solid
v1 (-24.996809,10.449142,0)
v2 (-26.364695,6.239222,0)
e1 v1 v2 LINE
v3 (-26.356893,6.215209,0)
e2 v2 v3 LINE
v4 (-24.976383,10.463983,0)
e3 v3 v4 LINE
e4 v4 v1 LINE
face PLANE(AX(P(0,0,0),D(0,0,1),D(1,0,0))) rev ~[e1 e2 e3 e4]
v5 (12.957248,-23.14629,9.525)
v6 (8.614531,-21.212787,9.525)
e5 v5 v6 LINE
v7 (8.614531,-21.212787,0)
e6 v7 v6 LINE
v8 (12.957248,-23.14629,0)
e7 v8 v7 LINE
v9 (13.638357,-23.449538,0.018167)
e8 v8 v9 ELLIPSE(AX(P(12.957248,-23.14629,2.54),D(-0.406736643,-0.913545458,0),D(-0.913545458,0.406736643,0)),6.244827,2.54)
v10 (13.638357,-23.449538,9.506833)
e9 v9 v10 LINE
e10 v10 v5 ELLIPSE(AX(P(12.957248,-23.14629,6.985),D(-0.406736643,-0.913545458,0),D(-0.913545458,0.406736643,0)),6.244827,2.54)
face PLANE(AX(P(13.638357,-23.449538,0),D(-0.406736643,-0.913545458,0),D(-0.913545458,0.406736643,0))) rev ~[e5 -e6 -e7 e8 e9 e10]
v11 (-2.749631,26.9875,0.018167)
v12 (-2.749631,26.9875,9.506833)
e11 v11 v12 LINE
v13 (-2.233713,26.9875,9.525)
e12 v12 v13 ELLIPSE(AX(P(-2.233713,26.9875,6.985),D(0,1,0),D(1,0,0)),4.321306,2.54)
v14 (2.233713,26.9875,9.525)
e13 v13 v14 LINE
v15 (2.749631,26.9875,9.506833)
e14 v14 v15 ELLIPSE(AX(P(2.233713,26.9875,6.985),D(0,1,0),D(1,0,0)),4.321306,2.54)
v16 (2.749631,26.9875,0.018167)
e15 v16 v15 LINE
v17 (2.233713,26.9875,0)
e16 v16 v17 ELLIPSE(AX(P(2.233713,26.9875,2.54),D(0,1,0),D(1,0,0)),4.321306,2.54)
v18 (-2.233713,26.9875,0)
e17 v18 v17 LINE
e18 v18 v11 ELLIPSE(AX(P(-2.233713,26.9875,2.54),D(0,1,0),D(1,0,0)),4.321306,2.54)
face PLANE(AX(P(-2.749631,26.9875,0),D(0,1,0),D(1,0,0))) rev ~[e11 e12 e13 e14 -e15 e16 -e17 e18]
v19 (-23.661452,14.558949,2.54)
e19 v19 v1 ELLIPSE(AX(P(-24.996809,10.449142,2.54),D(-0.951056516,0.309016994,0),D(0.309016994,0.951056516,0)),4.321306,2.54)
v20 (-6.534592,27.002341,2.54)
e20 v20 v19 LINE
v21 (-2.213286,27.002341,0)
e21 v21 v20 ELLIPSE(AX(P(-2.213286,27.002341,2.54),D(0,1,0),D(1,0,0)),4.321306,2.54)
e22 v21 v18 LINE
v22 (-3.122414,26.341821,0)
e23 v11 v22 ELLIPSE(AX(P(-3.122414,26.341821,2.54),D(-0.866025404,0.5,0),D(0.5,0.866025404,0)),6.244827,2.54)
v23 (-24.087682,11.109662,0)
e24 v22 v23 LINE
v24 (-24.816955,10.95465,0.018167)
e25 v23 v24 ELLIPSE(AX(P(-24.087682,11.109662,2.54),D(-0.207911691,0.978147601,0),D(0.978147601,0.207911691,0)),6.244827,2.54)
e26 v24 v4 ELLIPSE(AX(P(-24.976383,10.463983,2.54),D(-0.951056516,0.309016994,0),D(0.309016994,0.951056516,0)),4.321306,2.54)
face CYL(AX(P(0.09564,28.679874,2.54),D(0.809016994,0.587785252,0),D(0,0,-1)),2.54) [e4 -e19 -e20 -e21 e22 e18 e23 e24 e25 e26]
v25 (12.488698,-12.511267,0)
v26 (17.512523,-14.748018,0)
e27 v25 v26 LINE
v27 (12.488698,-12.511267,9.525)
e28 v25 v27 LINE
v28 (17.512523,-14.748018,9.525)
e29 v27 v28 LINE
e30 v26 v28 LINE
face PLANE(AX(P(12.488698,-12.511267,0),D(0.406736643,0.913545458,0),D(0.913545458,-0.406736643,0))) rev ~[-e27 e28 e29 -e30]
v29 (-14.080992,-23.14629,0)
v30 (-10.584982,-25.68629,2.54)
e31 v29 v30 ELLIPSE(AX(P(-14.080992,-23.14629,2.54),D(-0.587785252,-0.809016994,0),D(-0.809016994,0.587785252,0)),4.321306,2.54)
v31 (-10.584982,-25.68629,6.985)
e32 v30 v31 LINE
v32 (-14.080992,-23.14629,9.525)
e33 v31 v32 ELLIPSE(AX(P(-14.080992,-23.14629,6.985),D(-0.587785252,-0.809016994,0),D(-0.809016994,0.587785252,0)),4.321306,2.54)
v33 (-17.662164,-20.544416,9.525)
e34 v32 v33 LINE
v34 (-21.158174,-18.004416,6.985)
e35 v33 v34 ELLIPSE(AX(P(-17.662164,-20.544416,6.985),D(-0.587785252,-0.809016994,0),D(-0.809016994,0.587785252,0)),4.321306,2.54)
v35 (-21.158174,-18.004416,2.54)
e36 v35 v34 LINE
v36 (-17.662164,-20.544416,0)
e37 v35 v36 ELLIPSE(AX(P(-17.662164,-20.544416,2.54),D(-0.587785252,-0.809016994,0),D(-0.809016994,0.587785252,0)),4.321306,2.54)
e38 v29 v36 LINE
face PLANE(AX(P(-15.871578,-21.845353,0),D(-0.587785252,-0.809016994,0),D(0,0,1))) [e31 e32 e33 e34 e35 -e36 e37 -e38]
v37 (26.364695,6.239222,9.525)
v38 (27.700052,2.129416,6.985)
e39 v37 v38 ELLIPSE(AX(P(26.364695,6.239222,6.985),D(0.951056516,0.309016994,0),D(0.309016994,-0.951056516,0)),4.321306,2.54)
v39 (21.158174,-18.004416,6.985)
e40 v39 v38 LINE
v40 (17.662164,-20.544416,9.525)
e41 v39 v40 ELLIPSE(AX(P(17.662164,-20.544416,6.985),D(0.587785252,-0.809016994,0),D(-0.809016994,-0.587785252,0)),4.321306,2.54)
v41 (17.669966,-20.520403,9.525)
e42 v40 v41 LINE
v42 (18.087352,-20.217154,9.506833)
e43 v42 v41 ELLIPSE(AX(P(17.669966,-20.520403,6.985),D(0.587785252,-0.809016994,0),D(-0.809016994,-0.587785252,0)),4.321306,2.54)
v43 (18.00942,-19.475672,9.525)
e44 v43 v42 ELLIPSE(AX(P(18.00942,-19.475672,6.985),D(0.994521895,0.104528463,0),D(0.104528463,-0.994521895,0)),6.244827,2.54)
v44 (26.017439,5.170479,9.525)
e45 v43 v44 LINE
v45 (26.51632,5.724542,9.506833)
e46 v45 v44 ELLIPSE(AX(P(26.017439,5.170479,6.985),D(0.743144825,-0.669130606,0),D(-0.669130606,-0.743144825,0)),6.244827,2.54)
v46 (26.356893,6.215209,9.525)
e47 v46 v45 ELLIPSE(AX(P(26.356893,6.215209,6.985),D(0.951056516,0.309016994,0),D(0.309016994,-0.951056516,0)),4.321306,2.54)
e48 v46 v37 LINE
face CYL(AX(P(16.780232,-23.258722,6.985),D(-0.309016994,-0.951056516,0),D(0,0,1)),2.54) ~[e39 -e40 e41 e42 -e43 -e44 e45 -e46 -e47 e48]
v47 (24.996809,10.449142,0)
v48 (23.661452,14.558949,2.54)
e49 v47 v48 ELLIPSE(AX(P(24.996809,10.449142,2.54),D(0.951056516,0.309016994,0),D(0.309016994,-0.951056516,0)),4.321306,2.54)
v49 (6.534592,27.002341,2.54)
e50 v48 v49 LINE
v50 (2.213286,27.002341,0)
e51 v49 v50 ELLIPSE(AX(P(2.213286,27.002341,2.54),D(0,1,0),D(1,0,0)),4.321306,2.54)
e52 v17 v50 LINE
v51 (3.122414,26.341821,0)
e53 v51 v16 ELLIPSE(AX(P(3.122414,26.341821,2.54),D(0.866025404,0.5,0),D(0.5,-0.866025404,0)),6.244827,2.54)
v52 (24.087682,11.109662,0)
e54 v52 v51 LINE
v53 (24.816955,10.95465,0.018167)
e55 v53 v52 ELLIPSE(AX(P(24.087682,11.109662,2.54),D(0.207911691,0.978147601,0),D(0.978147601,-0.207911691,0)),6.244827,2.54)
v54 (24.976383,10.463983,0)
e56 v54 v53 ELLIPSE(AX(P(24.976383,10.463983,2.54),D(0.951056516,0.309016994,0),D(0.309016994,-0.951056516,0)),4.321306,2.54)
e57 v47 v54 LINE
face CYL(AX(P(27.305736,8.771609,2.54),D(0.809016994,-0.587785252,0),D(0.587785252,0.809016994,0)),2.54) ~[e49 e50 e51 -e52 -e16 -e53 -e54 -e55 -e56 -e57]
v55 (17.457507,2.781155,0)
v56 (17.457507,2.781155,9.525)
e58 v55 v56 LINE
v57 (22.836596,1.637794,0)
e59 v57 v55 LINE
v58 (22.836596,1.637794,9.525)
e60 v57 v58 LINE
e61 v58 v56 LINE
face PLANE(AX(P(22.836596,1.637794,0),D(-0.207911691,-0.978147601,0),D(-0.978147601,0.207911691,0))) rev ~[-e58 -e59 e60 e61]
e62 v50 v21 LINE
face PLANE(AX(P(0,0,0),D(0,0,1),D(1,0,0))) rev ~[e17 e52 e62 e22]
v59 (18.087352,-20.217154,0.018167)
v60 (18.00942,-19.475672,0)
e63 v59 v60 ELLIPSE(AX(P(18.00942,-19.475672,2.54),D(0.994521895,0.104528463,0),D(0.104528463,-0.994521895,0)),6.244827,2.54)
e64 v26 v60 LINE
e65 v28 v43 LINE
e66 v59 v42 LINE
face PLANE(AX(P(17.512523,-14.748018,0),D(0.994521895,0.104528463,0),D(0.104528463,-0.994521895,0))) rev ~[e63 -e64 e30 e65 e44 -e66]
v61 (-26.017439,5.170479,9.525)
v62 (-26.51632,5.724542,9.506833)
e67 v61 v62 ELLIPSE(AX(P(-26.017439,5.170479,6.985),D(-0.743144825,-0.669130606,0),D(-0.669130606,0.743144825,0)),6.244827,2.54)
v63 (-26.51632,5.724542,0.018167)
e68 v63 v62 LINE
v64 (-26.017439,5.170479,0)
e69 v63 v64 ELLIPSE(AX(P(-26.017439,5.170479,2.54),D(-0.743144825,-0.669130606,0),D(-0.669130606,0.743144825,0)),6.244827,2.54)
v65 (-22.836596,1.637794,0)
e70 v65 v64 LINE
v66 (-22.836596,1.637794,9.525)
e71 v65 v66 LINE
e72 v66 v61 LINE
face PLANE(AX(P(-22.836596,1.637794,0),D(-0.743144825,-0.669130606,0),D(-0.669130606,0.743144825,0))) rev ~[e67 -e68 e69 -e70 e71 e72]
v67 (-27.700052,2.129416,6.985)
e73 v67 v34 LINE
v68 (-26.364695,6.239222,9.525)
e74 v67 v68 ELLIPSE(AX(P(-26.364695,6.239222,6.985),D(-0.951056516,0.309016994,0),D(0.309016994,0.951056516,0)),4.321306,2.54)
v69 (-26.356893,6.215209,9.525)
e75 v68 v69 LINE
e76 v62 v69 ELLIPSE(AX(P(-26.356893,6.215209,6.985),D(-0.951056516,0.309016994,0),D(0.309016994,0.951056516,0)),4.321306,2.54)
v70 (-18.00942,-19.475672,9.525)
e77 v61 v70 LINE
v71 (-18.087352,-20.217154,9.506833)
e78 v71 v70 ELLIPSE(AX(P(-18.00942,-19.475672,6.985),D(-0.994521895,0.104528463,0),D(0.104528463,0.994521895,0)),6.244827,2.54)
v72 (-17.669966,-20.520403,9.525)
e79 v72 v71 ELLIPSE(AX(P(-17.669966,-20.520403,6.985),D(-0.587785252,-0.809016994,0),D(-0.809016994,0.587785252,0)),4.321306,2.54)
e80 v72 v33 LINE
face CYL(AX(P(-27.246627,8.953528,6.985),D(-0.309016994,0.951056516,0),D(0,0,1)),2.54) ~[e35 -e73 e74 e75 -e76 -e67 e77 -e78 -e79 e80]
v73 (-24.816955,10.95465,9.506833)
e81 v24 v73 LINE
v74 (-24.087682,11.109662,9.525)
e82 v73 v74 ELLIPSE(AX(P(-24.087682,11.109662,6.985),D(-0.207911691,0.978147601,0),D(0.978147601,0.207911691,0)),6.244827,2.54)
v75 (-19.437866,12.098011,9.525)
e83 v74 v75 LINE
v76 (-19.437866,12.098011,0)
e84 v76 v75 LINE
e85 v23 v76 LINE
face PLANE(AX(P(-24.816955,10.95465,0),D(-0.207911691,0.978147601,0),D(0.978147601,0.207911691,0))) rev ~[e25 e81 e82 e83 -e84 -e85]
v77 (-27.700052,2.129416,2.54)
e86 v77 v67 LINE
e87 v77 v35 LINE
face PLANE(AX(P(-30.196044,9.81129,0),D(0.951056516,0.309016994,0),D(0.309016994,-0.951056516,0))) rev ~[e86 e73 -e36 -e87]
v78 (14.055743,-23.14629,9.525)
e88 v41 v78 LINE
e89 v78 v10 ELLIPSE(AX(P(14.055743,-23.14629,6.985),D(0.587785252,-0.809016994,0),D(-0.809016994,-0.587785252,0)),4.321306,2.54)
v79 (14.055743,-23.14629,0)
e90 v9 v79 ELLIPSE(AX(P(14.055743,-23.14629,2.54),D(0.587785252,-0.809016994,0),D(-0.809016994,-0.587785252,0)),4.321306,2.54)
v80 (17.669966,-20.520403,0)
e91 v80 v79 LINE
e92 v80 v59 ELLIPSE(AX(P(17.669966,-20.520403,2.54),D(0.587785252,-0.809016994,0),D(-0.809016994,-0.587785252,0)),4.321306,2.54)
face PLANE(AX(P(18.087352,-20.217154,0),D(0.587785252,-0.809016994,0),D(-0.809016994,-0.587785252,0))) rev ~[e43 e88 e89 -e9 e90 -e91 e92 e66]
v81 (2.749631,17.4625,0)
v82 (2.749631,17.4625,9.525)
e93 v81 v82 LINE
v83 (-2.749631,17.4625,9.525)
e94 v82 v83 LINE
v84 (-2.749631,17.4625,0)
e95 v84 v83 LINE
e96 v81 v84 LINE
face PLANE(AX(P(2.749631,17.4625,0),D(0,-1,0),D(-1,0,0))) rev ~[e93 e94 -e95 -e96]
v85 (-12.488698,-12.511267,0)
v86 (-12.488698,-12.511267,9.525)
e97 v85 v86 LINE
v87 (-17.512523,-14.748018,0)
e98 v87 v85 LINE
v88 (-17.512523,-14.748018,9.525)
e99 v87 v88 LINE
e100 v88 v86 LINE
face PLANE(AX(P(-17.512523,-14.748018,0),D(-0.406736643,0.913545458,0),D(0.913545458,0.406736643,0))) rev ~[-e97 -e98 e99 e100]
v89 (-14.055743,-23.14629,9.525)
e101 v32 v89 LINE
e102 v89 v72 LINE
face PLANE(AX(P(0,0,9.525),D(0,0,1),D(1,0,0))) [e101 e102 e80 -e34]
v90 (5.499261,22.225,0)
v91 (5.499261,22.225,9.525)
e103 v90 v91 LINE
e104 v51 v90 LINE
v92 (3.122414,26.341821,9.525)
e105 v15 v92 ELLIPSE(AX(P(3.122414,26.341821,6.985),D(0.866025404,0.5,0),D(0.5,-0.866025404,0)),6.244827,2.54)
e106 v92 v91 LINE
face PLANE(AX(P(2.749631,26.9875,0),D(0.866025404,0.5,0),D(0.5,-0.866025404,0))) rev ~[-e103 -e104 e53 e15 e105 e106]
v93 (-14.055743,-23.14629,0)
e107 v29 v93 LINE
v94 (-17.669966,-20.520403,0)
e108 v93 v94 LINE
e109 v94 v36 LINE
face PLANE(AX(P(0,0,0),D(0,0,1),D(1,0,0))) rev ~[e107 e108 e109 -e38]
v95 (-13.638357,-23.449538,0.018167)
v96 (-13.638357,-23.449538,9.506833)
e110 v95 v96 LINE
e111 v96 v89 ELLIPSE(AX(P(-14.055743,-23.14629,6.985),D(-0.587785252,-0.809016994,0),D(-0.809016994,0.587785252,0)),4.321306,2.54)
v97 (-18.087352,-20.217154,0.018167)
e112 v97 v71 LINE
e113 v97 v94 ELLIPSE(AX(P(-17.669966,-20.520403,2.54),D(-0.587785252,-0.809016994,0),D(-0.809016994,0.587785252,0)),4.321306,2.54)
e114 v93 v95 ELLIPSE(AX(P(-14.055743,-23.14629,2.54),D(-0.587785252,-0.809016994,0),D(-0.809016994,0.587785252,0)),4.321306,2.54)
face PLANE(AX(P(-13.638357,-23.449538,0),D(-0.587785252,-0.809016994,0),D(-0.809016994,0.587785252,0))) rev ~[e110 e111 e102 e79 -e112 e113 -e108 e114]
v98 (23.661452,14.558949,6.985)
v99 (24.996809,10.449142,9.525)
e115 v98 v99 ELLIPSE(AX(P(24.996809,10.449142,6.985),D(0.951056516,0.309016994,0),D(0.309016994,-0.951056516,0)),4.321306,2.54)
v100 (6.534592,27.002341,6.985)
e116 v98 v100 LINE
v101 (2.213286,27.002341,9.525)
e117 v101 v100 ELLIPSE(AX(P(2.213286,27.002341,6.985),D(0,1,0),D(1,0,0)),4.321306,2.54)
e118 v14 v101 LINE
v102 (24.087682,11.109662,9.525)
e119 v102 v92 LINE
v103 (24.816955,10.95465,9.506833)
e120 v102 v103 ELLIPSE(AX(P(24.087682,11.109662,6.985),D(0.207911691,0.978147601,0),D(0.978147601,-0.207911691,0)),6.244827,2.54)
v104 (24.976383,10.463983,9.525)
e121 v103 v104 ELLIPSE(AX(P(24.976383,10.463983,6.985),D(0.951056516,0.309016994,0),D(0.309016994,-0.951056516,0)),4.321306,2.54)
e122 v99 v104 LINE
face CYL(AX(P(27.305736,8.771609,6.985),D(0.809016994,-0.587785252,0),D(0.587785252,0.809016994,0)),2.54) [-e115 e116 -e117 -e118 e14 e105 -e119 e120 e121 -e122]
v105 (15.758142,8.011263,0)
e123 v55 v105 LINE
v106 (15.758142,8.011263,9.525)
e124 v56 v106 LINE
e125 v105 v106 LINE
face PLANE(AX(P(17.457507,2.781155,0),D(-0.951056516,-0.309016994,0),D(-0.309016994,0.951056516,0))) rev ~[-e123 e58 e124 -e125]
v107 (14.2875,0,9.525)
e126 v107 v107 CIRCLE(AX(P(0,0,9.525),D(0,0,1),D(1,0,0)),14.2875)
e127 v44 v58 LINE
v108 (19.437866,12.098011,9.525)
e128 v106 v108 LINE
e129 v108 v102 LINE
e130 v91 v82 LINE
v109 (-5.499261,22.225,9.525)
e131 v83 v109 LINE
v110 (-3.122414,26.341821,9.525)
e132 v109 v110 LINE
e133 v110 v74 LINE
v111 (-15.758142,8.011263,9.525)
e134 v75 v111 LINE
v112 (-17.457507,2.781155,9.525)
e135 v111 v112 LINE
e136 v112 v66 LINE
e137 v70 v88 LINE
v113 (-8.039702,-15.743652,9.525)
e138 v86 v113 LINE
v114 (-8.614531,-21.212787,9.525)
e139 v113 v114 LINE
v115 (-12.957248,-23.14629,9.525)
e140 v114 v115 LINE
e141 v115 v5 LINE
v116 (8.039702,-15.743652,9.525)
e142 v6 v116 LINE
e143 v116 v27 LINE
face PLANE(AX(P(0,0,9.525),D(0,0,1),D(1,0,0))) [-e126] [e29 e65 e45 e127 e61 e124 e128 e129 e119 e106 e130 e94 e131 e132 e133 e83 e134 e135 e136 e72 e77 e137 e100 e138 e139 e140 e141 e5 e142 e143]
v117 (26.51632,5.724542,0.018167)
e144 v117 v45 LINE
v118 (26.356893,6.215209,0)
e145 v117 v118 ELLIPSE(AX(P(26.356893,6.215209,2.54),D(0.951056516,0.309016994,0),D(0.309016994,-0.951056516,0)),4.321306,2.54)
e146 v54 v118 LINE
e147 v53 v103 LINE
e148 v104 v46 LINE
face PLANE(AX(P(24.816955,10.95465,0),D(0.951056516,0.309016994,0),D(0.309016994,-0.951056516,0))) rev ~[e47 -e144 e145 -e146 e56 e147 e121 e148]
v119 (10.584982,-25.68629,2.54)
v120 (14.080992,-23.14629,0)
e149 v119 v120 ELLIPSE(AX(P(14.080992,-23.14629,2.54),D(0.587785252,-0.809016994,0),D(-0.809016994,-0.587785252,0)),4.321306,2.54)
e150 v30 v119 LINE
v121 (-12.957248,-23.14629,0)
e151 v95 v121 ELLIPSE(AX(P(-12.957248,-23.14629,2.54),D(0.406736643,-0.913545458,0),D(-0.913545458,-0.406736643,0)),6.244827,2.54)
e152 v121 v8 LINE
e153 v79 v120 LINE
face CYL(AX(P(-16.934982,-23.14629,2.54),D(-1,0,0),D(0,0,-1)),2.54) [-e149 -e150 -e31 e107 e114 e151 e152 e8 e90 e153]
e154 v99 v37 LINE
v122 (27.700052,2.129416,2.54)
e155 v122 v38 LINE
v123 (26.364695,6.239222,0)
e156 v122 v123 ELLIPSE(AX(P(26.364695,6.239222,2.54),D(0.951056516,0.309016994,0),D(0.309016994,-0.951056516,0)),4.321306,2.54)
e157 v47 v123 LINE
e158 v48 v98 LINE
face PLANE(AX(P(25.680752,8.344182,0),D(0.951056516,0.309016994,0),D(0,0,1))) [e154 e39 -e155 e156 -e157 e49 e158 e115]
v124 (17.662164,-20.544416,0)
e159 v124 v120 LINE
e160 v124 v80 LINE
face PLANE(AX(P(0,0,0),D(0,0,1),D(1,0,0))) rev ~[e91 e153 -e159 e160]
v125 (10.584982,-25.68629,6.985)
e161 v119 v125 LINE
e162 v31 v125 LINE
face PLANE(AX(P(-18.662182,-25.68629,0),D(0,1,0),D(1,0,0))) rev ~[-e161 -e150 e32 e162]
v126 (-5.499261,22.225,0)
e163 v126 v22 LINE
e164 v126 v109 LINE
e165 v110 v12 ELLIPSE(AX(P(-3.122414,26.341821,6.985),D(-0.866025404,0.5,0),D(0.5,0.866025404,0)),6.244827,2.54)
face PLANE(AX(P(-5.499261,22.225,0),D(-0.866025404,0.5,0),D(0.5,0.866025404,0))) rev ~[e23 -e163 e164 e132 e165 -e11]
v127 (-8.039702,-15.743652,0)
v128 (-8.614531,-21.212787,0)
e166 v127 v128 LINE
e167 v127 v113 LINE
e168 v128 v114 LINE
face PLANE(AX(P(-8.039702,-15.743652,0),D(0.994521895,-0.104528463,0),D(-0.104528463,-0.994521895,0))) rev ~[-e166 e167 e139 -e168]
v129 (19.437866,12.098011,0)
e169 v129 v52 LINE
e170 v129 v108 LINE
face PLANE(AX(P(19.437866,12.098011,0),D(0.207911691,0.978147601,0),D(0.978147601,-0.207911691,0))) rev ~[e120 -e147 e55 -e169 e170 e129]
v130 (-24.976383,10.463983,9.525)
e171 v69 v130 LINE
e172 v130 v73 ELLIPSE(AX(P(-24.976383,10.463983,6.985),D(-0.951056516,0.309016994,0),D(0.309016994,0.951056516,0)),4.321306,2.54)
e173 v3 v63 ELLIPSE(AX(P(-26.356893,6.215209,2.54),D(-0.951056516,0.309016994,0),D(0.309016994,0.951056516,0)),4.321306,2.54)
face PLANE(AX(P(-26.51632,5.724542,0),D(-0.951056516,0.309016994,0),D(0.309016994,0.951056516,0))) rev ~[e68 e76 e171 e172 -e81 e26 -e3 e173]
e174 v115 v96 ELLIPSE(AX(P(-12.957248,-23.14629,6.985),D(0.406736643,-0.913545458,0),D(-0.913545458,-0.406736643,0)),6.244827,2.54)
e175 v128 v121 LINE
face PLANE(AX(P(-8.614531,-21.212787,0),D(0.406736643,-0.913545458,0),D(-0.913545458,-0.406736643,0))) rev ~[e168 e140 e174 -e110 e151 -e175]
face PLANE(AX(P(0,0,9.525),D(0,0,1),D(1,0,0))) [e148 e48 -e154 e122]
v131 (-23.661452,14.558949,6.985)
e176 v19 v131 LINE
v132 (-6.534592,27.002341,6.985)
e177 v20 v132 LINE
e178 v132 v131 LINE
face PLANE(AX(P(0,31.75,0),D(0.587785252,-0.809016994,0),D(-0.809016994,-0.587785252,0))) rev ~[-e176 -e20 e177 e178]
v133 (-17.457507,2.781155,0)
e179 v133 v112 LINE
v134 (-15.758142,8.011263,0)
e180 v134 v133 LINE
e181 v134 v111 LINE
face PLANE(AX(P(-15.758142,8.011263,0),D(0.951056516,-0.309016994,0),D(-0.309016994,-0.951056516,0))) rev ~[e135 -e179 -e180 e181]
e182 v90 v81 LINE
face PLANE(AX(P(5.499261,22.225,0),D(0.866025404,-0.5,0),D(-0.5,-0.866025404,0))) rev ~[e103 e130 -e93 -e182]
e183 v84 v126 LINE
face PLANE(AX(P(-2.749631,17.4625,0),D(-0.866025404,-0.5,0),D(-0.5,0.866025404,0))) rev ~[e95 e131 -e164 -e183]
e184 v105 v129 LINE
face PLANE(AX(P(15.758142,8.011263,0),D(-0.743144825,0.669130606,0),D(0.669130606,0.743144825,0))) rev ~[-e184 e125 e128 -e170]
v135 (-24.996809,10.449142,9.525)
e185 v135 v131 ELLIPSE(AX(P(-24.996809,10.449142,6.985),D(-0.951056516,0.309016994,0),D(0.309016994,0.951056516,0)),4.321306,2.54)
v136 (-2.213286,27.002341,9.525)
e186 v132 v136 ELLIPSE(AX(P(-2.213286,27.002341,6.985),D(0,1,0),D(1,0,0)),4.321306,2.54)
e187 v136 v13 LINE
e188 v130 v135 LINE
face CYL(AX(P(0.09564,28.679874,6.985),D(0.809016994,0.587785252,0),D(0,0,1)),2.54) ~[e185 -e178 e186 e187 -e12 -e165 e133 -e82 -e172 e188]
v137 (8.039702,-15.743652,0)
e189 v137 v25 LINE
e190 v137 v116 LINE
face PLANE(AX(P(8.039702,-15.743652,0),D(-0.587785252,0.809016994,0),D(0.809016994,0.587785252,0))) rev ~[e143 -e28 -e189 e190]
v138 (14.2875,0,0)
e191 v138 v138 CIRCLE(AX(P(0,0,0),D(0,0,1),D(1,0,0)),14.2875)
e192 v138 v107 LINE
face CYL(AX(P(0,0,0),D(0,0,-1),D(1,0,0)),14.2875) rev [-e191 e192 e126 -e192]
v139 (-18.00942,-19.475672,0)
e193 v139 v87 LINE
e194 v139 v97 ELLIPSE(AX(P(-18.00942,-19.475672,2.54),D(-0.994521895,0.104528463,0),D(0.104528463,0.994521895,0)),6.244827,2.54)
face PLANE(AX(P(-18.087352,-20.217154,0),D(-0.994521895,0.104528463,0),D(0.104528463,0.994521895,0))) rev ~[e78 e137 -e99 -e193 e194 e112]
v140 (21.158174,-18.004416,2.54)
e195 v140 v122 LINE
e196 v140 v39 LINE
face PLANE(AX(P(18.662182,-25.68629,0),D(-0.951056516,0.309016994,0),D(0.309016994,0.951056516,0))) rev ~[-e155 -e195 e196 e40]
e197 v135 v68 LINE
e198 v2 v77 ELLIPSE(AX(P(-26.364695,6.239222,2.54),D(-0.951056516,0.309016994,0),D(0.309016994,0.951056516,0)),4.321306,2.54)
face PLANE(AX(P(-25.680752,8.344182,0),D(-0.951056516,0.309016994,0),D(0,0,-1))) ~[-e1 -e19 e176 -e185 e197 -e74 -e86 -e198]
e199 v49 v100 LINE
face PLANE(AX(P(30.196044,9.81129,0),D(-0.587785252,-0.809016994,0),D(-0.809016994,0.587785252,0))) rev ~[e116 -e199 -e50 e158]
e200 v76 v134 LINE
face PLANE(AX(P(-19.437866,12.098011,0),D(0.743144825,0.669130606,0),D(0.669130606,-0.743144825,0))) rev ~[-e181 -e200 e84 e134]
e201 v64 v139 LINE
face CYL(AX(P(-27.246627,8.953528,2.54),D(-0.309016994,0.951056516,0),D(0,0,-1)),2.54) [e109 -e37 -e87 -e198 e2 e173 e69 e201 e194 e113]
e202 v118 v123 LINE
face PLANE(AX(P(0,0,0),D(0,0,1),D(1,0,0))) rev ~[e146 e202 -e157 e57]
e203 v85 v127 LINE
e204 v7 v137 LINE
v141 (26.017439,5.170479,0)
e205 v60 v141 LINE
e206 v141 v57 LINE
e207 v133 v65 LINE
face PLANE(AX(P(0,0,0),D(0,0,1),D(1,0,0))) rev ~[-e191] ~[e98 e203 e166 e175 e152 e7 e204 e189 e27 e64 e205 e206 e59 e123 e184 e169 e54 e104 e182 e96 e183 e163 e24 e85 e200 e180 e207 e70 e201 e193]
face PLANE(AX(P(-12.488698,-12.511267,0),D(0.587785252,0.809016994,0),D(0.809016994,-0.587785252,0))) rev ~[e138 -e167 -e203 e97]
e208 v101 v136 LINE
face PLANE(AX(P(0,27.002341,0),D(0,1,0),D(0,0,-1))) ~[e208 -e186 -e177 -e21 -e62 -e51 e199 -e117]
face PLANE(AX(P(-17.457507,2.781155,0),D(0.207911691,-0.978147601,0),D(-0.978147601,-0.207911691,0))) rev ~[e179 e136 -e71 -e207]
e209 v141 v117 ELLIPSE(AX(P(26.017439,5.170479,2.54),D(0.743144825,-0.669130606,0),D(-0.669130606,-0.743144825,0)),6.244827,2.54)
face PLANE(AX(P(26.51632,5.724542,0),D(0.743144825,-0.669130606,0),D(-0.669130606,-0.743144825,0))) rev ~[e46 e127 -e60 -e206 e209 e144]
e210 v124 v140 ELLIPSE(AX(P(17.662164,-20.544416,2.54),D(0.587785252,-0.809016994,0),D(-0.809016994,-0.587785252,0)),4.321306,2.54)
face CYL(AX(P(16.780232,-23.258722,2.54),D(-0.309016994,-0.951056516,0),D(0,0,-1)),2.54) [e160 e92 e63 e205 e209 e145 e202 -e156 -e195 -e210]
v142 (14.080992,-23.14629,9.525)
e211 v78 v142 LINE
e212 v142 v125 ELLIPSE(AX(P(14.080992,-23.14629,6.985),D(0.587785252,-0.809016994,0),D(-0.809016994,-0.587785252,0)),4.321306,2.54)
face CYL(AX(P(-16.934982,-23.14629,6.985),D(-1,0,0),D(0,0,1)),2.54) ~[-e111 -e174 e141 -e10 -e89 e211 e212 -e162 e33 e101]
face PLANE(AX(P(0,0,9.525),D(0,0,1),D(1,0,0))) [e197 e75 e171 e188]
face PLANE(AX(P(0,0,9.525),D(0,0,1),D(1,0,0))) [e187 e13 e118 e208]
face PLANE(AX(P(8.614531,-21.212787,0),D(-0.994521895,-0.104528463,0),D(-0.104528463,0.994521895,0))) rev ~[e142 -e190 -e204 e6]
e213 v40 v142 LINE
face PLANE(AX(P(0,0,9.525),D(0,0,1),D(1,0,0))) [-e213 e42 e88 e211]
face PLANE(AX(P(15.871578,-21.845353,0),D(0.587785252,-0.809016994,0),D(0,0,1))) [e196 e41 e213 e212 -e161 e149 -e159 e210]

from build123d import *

# Parameters (mm, degrees)
F0_R        = 14.2875
F1_DEPTH    = 9.525
F2_SIZE     = 8.0772
F3_T1_DEPTH = 33.8699635206
F3_T3_DEPTH = 33.8699635206
F3_T5_DEPTH = 33.8699635206
F3_T7_DEPTH = 33.8699635206
F3_T9_DEPTH = 33.8699635206
F4_T1_DEPTH = 33.8699635206
F4_T3_DEPTH = 33.8699635206
F4_T5_DEPTH = 33.8699635206
F4_T7_DEPTH = 33.8699635206
F4_T9_DEPTH = 33.8699635206


# Not quite as in the source:
# - a fillet or chamfer that OpenCascade refuses, or shapes differently, is made with other operations: its cross-section is extruded or revolved along the edge and cut away or added


with BuildPart() as f1:
    # F0 (on Top) → F1 (new body)
    with BuildSketch(Plane.XY):
        Polygon((30.1960443924, 9.8112895714), (0, 31.75), (-30.1960443924, 9.8112895714), (-18.6621817603, -25.6862895714), (18.6621817603, -25.6862895714), align=None)
        Polygon((-18.087352426, -20.2171537862), (-17.5125230918, -14.7480180011), (-12.4886978979, -12.5112669148), (-8.0397020384, -15.7436516137), (-8.6145313726, -21.2127873989), (-13.6383565665, -23.4495384851), align=None, mode=Mode.SUBTRACT)
        Circle(F0_R, mode=Mode.SUBTRACT)
        Polygon((13.6383565665, -23.4495384851), (8.6145313726, -21.2127873989), (8.0397020384, -15.7436516137), (12.4886978979, -12.5112669148), (17.5125230918, -14.7480180011), (18.087352426, -20.2171537862), align=None, mode=Mode.SUBTRACT)
        Polygon((-24.8169551322, 10.9546502895), (-19.4378658721, 12.0980110075), (-15.7581418145, 8.011263418), (-17.4575070171, 2.7811551105), (-22.8365962772, 1.6377943925), (-26.5163203348, 5.7245419819), align=None, mode=Mode.SUBTRACT)
        Polygon((-5.499261314, 22.225), (-2.749630657, 26.9875), (2.749630657, 26.9875), (5.499261314, 22.225), (2.749630657, 17.4625), (-2.749630657, 17.4625), align=None, mode=Mode.SUBTRACT)
        Polygon((26.5163203348, 5.7245419819), (22.8365962772, 1.6377943925), (17.4575070171, 2.7811551105), (15.7581418145, 8.011263418), (19.4378658721, 12.0980110075), (24.8169551322, 10.9546502895), align=None, mode=Mode.SUBTRACT)
    extrude(amount=F1_DEPTH)

    # F2
    f2_edges = [f1.edges().sort_by_distance(p)[0] for p in [
        (-18.662182, -25.68629, 4.7625),
        (18.662182, -25.68629, 4.7625),
        (30.196044, 9.81129, 4.7625),
        (0, 31.75, 4.7625),
        (-30.196044, 9.81129, 4.7625),
    ]]
    chamfer(f2_edges, length=F2_SIZE)

    # F3: fillet of radius 2.54 on 5 edges, made by hand

    # F3_s2 → F3_t1 (cut)
    with BuildSketch(Plane(origin=(-5.2331971634, -16.1061247565, 0), x_dir=(0, 0, 1), z_dir=(0.3090169944, 0.9510565163, 0))):
        with BuildLine():
            ThreePointArc((9.525, 23.1462895714), (8.7810512242, 24.9423407956), (6.985, 25.6862895714))
            Line((6.985, 25.6862895714), (9.525, 25.6862895714))
            Line((9.525, 25.6862895714), (9.525, 23.1462895714))
        make_face()
    extrude(amount=F3_T1_DEPTH, mode=Mode.SUBTRACT)

    # F3_s4 → F3_t3 (cut)
    with BuildSketch(Plane.YZ.offset(-16.9349817603)):
        with BuildLine():
            ThreePointArc((-23.1462895714, 9.525), (-24.9423407956, 8.7810512242), (-25.6862895714, 6.985))
            Line((-25.6862895714, 6.985), (-25.6862895714, 9.525))
            Line((-25.6862895714, 9.525), (-23.1462895714, 9.525))
        make_face()
    extrude(amount=F3_T3_DEPTH, mode=Mode.SUBTRACT)

    # F3_s6 → F3_t5 (cut)
    with BuildSketch(Plane(origin=(-5.2331971634, 16.1061247565, 0), x_dir=(0, 0, 1), z_dir=(0.3090169944, -0.9510565163, 0))):
        with BuildLine():
            ThreePointArc((9.525, 23.1462895714), (8.7810512242, 24.9423407956), (6.985, 25.6862895714))
            Line((6.985, 25.6862895714), (9.525, 25.6862895714))
            Line((9.525, 25.6862895714), (9.525, 23.1462895714))
        make_face()
    extrude(amount=F3_T5_DEPTH, mode=Mode.SUBTRACT)

    # F3_s8 → F3_t7 (cut)
    with BuildSketch(Plane(origin=(13.7006880435, 9.9541325265, 0), x_dir=(0, 0, 1), z_dir=(-0.8090169944, -0.5877852523, 0))):
        with BuildLine():
            ThreePointArc((9.525, 23.1462895714), (8.7810512242, 24.9423407956), (6.985, 25.6862895714))
            Line((6.985, 25.6862895714), (9.525, 25.6862895714))
            Line((9.525, 25.6862895714), (9.525, 23.1462895714))
        make_face()
    extrude(amount=F3_T7_DEPTH, mode=Mode.SUBTRACT)

    # F3_s10 → F3_t9 (cut)
    with BuildSketch(Plane(origin=(13.7006880435, -9.9541325265, 0), x_dir=(0, 0, 1), z_dir=(-0.8090169944, 0.5877852523, 0))):
        with BuildLine():
            ThreePointArc((6.985, 25.6862895714), (8.7810512242, 24.9423407956), (9.525, 23.1462895714))
            Line((9.525, 23.1462895714), (9.525, 25.6862895714))
            Line((9.525, 25.6862895714), (6.985, 25.6862895714))
        make_face()
    extrude(amount=F3_T9_DEPTH, mode=Mode.SUBTRACT)

    # F4: fillet of radius 2.54 on 5 edges, made by hand

    # F4_s2 → F4_t1 (cut)
    with BuildSketch(Plane(origin=(-5.2331971634, -16.1061247565, 0), x_dir=(0, 0, 1), z_dir=(0.3090169944, 0.9510565163, 0))):
        with BuildLine():
            ThreePointArc((0, 23.1462895714), (0.7439487758, 24.9423407956), (2.54, 25.6862895714))
            Line((2.54, 25.6862895714), (0, 25.6862895714))
            Line((0, 25.6862895714), (0, 23.1462895714))
        make_face()
    extrude(amount=F4_T1_DEPTH, mode=Mode.SUBTRACT)

    # F4_s4 → F4_t3 (cut)
    with BuildSketch(Plane.YZ.offset(-16.9349817603)):
        with BuildLine():
            ThreePointArc((-23.1462895714, 0), (-24.9423407956, 0.7439487758), (-25.6862895714, 2.54))
            Line((-25.6862895714, 2.54), (-25.6862895714, 0))
            Line((-25.6862895714, 0), (-23.1462895714, 0))
        make_face()
    extrude(amount=F4_T3_DEPTH, mode=Mode.SUBTRACT)

    # F4_s6 → F4_t5 (cut)
    with BuildSketch(Plane(origin=(13.7006880435, 9.9541325265, 0), x_dir=(0, 0, 1), z_dir=(-0.8090169944, -0.5877852523, 0))):
        with BuildLine():
            ThreePointArc((0, 23.1462895714), (0.7439487758, 24.9423407956), (2.54, 25.6862895714))
            Line((2.54, 25.6862895714), (0, 25.6862895714))
            Line((0, 25.6862895714), (0, 23.1462895714))
        make_face()
    extrude(amount=F4_T5_DEPTH, mode=Mode.SUBTRACT)

    # F4_s8 → F4_t7 (cut)
    with BuildSketch(Plane(origin=(13.7006880435, -9.9541325265, 0), x_dir=(0, 0, 1), z_dir=(-0.8090169944, 0.5877852523, 0))):
        with BuildLine():
            ThreePointArc((2.54, 25.6862895714), (0.7439487758, 24.9423407956), (0, 23.1462895714))
            Line((0, 23.1462895714), (0, 25.6862895714))
            Line((0, 25.6862895714), (2.54, 25.6862895714))
        make_face()
    extrude(amount=F4_T7_DEPTH, mode=Mode.SUBTRACT)

    # F4_s10 → F4_t9 (cut)
    with BuildSketch(Plane(origin=(-5.2331971634, 16.1061247565, 0), x_dir=(0, 0, 1), z_dir=(0.3090169944, -0.9510565163, 0))):
        with BuildLine():
            ThreePointArc((0, 23.1462895714), (0.7439487758, 24.9423407956), (2.54, 25.6862895714))
            Line((2.54, 25.6862895714), (0, 25.6862895714))
            Line((0, 25.6862895714), (0, 23.1462895714))
        make_face()
    extrude(amount=F4_T9_DEPTH, mode=Mode.SUBTRACT)


solid = f1.part
